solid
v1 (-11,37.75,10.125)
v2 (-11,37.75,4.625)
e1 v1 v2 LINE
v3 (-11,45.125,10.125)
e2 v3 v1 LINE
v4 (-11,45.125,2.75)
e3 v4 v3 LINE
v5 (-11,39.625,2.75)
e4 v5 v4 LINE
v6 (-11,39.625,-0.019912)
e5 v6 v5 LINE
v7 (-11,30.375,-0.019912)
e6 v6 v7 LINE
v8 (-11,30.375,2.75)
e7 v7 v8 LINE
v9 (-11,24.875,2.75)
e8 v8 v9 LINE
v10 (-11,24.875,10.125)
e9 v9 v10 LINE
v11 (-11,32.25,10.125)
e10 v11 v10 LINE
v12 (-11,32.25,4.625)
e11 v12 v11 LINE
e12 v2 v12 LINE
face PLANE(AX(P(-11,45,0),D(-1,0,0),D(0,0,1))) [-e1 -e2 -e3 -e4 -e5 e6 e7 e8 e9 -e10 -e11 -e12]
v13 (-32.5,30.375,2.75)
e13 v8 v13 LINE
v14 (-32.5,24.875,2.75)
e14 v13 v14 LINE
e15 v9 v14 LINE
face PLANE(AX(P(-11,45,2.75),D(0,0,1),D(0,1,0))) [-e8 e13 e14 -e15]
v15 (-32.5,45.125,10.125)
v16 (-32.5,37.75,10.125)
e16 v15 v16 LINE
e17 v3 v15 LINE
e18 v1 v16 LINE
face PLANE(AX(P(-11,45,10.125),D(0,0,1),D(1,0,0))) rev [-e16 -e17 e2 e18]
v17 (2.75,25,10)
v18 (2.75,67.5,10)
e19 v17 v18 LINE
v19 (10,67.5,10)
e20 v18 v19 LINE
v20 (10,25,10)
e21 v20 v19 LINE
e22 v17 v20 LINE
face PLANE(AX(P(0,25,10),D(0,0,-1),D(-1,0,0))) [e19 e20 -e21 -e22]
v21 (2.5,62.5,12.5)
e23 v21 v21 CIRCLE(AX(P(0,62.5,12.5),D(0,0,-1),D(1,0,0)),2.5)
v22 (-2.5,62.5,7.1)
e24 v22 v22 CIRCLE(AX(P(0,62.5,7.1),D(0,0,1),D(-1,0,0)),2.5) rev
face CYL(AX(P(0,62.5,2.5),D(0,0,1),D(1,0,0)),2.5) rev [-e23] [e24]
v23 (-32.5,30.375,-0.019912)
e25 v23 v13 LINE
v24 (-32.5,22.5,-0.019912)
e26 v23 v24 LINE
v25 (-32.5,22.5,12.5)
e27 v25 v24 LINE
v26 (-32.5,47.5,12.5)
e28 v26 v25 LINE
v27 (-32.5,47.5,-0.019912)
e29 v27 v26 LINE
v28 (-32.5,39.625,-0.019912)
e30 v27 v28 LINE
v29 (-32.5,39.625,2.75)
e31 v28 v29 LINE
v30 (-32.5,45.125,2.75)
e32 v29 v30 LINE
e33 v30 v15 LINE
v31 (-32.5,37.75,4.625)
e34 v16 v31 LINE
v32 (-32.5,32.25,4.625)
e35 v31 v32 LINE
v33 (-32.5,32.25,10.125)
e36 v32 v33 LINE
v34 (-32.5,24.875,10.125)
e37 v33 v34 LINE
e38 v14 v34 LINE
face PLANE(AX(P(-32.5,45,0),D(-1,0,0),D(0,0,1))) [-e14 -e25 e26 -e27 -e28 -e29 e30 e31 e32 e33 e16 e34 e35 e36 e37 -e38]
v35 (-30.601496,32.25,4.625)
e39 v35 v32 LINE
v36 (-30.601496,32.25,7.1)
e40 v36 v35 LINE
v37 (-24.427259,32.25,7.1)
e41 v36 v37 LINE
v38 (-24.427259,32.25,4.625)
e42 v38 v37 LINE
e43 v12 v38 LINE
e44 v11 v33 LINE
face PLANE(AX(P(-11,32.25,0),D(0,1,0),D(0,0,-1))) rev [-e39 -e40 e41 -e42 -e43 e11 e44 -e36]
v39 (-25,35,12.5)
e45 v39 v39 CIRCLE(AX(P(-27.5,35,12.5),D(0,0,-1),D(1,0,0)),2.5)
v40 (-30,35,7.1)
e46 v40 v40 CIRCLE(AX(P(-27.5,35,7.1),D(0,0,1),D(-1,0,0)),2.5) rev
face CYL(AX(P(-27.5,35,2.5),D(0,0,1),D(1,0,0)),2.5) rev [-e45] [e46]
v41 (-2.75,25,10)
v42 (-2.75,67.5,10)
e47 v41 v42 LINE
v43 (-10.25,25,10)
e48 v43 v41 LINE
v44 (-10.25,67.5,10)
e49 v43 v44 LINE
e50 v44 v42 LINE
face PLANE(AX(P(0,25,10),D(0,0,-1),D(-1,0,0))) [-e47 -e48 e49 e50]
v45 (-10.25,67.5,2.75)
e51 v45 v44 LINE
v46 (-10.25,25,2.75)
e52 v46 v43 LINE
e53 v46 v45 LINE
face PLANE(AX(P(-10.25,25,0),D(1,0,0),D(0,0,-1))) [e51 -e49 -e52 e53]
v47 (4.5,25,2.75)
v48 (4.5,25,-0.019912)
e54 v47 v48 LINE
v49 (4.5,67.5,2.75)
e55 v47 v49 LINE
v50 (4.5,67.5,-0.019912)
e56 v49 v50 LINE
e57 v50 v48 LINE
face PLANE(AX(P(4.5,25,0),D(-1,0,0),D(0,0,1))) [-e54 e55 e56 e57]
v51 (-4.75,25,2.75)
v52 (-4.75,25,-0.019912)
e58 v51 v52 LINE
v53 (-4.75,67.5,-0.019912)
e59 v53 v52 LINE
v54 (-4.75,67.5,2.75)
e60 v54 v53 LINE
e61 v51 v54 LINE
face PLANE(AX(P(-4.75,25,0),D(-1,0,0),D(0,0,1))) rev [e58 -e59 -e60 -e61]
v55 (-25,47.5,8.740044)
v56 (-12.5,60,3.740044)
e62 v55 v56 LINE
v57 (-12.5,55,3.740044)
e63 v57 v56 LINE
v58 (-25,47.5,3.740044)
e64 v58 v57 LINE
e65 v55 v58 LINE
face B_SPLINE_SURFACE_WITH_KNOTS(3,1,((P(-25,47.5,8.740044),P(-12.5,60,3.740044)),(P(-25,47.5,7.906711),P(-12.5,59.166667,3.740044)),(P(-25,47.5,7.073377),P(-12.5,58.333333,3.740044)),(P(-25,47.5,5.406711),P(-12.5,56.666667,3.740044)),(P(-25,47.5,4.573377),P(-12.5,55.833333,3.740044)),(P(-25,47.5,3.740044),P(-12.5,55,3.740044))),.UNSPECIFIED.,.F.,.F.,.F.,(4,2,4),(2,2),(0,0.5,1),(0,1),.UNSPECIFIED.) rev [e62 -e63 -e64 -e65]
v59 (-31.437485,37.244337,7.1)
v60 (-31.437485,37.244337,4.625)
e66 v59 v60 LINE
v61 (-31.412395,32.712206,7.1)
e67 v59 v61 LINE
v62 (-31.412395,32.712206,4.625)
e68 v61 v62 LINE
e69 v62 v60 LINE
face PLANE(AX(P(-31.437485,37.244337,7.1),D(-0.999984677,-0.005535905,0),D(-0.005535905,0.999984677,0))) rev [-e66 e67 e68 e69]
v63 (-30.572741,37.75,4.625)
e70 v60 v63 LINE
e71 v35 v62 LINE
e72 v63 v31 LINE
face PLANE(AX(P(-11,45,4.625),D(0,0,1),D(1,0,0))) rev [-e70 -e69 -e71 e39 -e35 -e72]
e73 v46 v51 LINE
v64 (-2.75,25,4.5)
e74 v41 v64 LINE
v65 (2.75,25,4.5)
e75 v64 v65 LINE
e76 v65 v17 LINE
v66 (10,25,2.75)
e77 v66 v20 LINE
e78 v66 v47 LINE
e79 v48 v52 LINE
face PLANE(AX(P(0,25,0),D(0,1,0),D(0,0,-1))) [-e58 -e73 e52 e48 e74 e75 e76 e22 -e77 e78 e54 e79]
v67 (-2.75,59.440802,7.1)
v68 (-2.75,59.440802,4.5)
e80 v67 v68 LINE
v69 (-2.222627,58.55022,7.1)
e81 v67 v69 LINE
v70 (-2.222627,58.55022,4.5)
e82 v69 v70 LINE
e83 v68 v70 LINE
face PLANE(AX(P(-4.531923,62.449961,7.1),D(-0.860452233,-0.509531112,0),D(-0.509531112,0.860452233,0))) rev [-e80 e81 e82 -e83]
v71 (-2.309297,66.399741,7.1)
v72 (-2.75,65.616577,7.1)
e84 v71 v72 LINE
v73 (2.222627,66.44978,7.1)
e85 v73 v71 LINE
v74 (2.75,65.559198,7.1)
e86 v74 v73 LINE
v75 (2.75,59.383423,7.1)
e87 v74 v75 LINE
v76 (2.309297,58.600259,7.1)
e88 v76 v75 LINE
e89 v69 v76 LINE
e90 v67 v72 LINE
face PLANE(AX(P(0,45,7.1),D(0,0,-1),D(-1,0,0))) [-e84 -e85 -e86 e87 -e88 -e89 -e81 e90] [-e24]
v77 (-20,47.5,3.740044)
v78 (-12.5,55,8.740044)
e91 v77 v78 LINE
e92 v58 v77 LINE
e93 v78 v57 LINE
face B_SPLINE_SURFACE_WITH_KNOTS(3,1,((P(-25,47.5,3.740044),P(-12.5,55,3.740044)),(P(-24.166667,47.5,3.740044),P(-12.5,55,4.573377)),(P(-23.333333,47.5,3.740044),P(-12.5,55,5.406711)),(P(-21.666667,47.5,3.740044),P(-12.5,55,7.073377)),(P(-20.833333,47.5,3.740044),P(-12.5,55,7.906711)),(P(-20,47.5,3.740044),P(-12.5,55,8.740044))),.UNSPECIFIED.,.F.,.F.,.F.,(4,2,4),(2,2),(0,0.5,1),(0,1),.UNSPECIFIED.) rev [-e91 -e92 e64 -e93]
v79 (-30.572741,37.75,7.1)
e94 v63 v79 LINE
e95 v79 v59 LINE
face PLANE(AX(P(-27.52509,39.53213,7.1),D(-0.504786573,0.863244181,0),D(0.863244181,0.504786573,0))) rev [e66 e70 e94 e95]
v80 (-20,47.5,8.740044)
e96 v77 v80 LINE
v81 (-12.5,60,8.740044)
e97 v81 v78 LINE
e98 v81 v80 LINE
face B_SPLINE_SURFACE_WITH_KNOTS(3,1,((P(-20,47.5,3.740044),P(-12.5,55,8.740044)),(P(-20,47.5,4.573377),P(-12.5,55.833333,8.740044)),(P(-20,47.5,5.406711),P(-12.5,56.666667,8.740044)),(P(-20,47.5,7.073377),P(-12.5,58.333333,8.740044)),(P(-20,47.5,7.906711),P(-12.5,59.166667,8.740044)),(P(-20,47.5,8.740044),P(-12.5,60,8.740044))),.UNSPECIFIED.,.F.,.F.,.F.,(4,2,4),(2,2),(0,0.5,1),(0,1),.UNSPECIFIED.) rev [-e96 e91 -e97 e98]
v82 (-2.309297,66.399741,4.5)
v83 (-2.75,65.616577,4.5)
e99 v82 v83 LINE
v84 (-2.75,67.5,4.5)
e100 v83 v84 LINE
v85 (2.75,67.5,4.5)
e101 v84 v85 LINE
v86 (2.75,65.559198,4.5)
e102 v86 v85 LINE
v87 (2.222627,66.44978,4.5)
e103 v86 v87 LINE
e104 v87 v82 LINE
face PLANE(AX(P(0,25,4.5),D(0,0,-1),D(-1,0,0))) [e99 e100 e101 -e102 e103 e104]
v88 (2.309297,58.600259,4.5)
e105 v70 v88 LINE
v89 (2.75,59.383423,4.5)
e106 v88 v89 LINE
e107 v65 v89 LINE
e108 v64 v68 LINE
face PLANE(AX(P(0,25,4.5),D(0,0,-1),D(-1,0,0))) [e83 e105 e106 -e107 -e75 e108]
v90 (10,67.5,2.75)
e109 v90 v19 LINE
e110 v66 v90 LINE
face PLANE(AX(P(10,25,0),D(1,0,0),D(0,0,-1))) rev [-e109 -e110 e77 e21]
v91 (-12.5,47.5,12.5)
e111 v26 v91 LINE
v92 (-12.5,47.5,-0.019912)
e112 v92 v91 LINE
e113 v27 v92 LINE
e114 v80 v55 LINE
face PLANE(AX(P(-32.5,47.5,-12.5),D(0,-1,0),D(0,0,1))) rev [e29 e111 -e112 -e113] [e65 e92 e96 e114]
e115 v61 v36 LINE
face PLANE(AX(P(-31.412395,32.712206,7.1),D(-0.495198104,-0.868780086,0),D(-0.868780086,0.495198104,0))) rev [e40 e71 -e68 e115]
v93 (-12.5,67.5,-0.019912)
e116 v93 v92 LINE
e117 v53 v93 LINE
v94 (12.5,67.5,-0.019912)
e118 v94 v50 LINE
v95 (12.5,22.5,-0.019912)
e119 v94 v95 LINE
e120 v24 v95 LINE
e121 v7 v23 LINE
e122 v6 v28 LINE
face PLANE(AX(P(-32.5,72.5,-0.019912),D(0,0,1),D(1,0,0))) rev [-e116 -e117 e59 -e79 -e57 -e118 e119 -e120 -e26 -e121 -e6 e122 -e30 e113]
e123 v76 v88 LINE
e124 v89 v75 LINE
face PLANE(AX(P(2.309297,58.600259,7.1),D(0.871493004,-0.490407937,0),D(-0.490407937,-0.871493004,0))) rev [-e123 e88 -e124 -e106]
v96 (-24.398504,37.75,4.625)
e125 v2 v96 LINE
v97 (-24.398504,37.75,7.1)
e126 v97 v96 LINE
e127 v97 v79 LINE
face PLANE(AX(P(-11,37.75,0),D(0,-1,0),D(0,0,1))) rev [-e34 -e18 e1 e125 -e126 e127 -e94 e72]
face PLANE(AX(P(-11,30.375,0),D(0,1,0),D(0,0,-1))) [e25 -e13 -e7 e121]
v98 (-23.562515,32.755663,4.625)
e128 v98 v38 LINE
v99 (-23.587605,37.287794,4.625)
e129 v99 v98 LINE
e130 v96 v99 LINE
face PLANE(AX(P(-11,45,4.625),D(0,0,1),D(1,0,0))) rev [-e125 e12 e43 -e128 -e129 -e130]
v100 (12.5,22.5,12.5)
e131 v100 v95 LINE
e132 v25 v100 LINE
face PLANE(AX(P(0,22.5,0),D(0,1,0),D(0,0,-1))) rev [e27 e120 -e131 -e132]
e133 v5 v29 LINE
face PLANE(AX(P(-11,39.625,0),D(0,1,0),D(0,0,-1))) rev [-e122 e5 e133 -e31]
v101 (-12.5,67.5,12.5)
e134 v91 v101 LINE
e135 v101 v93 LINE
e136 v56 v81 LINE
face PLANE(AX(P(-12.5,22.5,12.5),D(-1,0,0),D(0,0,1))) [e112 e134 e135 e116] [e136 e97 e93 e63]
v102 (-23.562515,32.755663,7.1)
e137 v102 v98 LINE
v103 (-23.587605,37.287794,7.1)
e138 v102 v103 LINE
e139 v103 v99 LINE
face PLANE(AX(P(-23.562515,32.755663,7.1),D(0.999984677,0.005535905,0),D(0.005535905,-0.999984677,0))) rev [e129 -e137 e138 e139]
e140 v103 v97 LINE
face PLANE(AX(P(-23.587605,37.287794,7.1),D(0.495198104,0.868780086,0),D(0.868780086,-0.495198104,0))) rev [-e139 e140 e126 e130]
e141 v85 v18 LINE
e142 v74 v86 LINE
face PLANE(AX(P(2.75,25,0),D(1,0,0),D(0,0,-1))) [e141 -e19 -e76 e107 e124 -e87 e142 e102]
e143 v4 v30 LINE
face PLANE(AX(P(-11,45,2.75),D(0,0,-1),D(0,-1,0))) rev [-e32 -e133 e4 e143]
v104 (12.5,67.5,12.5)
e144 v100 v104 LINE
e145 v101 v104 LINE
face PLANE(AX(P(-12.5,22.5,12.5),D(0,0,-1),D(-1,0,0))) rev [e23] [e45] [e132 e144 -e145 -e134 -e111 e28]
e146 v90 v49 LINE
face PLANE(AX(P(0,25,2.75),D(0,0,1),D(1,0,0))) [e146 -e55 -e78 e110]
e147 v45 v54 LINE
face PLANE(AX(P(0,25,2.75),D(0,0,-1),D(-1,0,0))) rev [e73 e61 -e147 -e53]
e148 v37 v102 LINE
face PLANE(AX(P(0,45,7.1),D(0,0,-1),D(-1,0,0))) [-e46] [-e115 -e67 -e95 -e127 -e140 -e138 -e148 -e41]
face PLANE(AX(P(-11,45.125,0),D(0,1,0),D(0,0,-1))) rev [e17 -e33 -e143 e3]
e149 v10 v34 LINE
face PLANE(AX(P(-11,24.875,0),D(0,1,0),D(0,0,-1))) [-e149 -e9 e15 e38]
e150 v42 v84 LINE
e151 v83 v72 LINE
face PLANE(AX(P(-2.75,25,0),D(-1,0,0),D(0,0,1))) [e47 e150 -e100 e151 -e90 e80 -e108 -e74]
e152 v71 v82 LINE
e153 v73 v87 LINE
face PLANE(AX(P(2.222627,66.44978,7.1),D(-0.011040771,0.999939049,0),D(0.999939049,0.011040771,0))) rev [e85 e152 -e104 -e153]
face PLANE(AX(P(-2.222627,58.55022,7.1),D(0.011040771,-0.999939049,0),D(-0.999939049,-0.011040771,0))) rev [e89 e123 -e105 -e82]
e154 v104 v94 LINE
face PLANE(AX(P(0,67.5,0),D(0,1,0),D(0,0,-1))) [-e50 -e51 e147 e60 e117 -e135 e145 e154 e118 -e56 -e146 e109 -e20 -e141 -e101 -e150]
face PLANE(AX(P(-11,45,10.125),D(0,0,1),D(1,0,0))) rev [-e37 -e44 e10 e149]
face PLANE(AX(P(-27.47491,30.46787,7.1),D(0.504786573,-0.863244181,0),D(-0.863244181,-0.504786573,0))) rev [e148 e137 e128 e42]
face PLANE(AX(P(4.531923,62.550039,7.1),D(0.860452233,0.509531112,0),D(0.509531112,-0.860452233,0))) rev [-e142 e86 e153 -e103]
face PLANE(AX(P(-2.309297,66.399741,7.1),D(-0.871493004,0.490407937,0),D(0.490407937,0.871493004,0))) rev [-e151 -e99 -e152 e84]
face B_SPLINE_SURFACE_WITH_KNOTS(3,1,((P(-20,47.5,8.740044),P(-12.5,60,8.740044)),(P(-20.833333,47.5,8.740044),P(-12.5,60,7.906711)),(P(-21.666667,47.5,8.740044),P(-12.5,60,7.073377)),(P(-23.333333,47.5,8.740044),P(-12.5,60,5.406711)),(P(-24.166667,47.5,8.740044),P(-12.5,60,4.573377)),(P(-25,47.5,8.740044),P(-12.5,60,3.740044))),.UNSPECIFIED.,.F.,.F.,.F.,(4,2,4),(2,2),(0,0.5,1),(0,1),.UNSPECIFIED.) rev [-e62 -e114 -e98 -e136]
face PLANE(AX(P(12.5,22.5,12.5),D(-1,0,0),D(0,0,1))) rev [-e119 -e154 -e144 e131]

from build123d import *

# Parameters (mm, degrees)
SKETCH1_W           = 25
SKETCH1_H           = 25
BOSS_EXTRUDE1_DEPTH = 22.5
SKETCH4_W           = 25
SKETCH4_H           = 25
BOSS_EXTRUDE2_DEPTH = 20
CUT_EXTRUDE2_DEPTH  = 42.5
CUT_EXTRUDE3_DEPTH  = 21.5
SKETCH6_R           = 2.25
CUT_EXTRUDE4_DEPTH  = 10
SKETCH10_R          = 2.5
CUT_EXTRUDE7_DEPTH  = 10
CUT_EXTRUDE8_DEPTH  = 2.6
SKETCH8_W           = 45
SKETCH8_H           = 12.480087705
CUT_EXTRUDE9_DEPTH  = 50


with BuildPart() as part:
    # Sketch1 → Boss-Extrude1 (new, symmetric)
    with BuildSketch(Plane(origin=(0, 0, 0), x_dir=(1, 0, 0), z_dir=(0, 1, 0))):
        Rectangle(SKETCH1_W, SKETCH1_H)
    extrude(amount=BOSS_EXTRUDE1_DEPTH, both=True)

    # Sketch4 → Boss-Extrude2 (add)
    with BuildSketch(Plane.ZY.offset(12.5)):
        with Locations((0, 10)):
            Rectangle(SKETCH4_W, SKETCH4_H)
    extrude(amount=BOSS_EXTRUDE2_DEPTH)

    # Sketch3 → Cut-Extrude2 (cut)
    with BuildSketch(Plane.XZ.offset(22.5)):
        Polygon((-2.75, 4.5), (-2.75, 10), (-10.25, 10), (-10.25, 2.75), (-4.75, 2.75), (-4.75, -2.75), (-10.25, -2.75), (-10.25, -10.25), (-2.75, -10.25), (-2.75, -4.75), (2.75, -4.75), (2.75, -10.25), (10, -10.25), (10, -2.75), (4.5, -2.75), (4.5, 2.75), (10, 2.75), (10, 10), (2.75, 10), (2.75, 4.5), align=None)
    extrude(amount=-CUT_EXTRUDE2_DEPTH, mode=Mode.SUBTRACT)

    # Sketch5 → Cut-Extrude3 (cut)
    with BuildSketch(Plane.ZY.offset(32.5)):
        Polygon((-10.125, 7.25), (-10.125, -0.125), (-2.75, -0.125), (-2.75, 5.375), (2.75, 5.375), (2.75, -0.125), (10.125, -0.125), (10.125, 7.25), (4.625, 7.25), (4.625, 12.75), (10.125, 12.75), (10.125, 20.125), (2.75, 20.125), (2.75, 14.625), (-2.75, 14.625), (-2.75, 20.125), (-10.125, 20.125), (-10.125, 12.75), (-4.625, 12.75), (-4.625, 7.25), align=None)
    extrude(amount=-CUT_EXTRUDE3_DEPTH, mode=Mode.SUBTRACT)

    # Sketch6 → Cut-Extrude4 (cut)
    with BuildSketch(Plane(origin=(0, 0, -12.5), x_dir=(-1, 0, 0), z_dir=(0, 0, -1))):
        with Locations((0, -12.5)):
            Circle(SKETCH6_R)
        with Locations((22.5, 10)):
            Circle(SKETCH6_R)
    extrude(amount=-CUT_EXTRUDE4_DEPTH, mode=Mode.SUBTRACT)

    # Sketch10 → Cut-Extrude7 (cut)
    with BuildSketch(Plane.XY.offset(12.5)):
        with Locations((-27.5, 10)):
            Circle(SKETCH10_R)
        with Locations((0, -17.5)):
            Circle(SKETCH10_R)
    extrude(amount=-CUT_EXTRUDE7_DEPTH, mode=Mode.SUBTRACT)

    # Sketch11 → Cut-Extrude8 (cut)
    with BuildSketch(Plane(origin=(0, 0, 4.5), x_dir=(-1, 0, 0), z_dir=(0, 0, -1))):
        Polygon((2.222626661, -13.550219745), (-2.309296709, -13.600258721), (-4.53192337, -17.550038976), (-2.222626661, -21.449780255), (2.309296709, -21.399741279), (4.53192337, -17.449961024), align=None)
        Polygon((31.412394942, 12.287793512), (27.474910171, 14.532130165), (23.562515229, 12.244336654), (23.587605058, 7.712206488), (27.525089829, 5.467869835), (31.437484771, 7.755663346), align=None)
    extrude(amount=-CUT_EXTRUDE8_DEPTH, mode=Mode.SUBTRACT)

    # Sketch8 → Cut-Extrude9 (cut)
    with BuildSketch(Plane(origin=(0, 22.5, 0), x_dir=(1, 0, 0), z_dir=(0, 1, 0))):
        with Locations((-10, 6.259956147)):
            Rectangle(SKETCH8_W, SKETCH8_H)
    extrude(amount=-CUT_EXTRUDE9_DEPTH, mode=Mode.SUBTRACT)

    # Loft1: read off the stored shape, not the designer's step
    # Loft1: loft between two sections, ruled curve by curve
    loft1_from = [
        Edge.make_bspline([(-20, -2.5, 8.740043853), (-20.833333333, -2.5, 8.740043853), (-21.666666667, -2.5, 8.740043853), (-23.333333333, -2.5, 8.740043853), (-24.166666667, -2.5, 8.740043853), (-25, -2.5, 8.740043853)], [0, 0, 0, 0, 0.5, 0.5, 1, 1, 1, 1], 3),
        Edge.make_bspline([(-25, -2.5, 8.740043853), (-25, -2.5, 7.906710519), (-25, -2.5, 7.073377186), (-25, -2.5, 5.406710519), (-25, -2.5, 4.573377186), (-25, -2.5, 3.740043853)], [0, 0, 0, 0, 0.5, 0.5, 1, 1, 1, 1], 3),
        Edge.make_bspline([(-20, -2.5, 3.740043853), (-20, -2.5, 4.573377186), (-20, -2.5, 5.406710519), (-20, -2.5, 7.073377186), (-20, -2.5, 7.906710519), (-20, -2.5, 8.740043853)], [0, 0, 0, 0, 0.5, 0.5, 1, 1, 1, 1], 3),
        Edge.make_bspline([(-25, -2.5, 3.740043853), (-24.166666667, -2.5, 3.740043853), (-23.333333333, -2.5, 3.740043853), (-21.666666667, -2.5, 3.740043853), (-20.833333333, -2.5, 3.740043853), (-20, -2.5, 3.740043853)], [0, 0, 0, 0, 0.5, 0.5, 1, 1, 1, 1], 3),
    ]
    loft1_to = [
        Edge.make_bspline([(-12.5, -15, 8.740043853), (-12.5, -15, 7.906710519), (-12.5, -15, 7.073377186), (-12.5, -15, 5.406710519), (-12.5, -15, 4.573377186), (-12.5, -15, 3.740043853)], [0, 0, 0, 0, 0.5, 0.5, 1, 1, 1, 1], 3),
        Edge.make_bspline([(-12.5, -15, 3.740043853), (-12.5, -14.166666667, 3.740043853), (-12.5, -13.333333333, 3.740043853), (-12.5, -11.666666667, 3.740043853), (-12.5, -10.833333333, 3.740043853), (-12.5, -10, 3.740043853)], [0, 0, 0, 0, 0.5, 0.5, 1, 1, 1, 1], 3),
        Edge.make_bspline([(-12.5, -10, 8.740043853), (-12.5, -10.833333333, 8.740043853), (-12.5, -11.666666667, 8.740043853), (-12.5, -13.333333333, 8.740043853), (-12.5, -14.166666667, 8.740043853), (-12.5, -15, 8.740043853)], [0, 0, 0, 0, 0.5, 0.5, 1, 1, 1, 1], 3),
        Edge.make_bspline([(-12.5, -10, 3.740043853), (-12.5, -10, 4.573377186), (-12.5, -10, 5.406710519), (-12.5, -10, 7.073377186), (-12.5, -10, 7.906710519), (-12.5, -10, 8.740043853)], [0, 0, 0, 0, 0.5, 0.5, 1, 1, 1, 1], 3),
    ]
    loft1 = Solid(Shell([*[Face.make_surface_from_curves(loft1_from[k], loft1_to[k]) for k in range(4)], Face(Wire(loft1_from)), Face(Wire(loft1_to))]))
    add(loft1)


with BuildPart() as body_2:
    # Mirror1: mirrored copy
    add(part.part.mirror(Plane(origin=(0, 22.5, 0), x_dir=(0, 0, 1), z_dir=(0, -1, 0))))


solid = body_2.part
